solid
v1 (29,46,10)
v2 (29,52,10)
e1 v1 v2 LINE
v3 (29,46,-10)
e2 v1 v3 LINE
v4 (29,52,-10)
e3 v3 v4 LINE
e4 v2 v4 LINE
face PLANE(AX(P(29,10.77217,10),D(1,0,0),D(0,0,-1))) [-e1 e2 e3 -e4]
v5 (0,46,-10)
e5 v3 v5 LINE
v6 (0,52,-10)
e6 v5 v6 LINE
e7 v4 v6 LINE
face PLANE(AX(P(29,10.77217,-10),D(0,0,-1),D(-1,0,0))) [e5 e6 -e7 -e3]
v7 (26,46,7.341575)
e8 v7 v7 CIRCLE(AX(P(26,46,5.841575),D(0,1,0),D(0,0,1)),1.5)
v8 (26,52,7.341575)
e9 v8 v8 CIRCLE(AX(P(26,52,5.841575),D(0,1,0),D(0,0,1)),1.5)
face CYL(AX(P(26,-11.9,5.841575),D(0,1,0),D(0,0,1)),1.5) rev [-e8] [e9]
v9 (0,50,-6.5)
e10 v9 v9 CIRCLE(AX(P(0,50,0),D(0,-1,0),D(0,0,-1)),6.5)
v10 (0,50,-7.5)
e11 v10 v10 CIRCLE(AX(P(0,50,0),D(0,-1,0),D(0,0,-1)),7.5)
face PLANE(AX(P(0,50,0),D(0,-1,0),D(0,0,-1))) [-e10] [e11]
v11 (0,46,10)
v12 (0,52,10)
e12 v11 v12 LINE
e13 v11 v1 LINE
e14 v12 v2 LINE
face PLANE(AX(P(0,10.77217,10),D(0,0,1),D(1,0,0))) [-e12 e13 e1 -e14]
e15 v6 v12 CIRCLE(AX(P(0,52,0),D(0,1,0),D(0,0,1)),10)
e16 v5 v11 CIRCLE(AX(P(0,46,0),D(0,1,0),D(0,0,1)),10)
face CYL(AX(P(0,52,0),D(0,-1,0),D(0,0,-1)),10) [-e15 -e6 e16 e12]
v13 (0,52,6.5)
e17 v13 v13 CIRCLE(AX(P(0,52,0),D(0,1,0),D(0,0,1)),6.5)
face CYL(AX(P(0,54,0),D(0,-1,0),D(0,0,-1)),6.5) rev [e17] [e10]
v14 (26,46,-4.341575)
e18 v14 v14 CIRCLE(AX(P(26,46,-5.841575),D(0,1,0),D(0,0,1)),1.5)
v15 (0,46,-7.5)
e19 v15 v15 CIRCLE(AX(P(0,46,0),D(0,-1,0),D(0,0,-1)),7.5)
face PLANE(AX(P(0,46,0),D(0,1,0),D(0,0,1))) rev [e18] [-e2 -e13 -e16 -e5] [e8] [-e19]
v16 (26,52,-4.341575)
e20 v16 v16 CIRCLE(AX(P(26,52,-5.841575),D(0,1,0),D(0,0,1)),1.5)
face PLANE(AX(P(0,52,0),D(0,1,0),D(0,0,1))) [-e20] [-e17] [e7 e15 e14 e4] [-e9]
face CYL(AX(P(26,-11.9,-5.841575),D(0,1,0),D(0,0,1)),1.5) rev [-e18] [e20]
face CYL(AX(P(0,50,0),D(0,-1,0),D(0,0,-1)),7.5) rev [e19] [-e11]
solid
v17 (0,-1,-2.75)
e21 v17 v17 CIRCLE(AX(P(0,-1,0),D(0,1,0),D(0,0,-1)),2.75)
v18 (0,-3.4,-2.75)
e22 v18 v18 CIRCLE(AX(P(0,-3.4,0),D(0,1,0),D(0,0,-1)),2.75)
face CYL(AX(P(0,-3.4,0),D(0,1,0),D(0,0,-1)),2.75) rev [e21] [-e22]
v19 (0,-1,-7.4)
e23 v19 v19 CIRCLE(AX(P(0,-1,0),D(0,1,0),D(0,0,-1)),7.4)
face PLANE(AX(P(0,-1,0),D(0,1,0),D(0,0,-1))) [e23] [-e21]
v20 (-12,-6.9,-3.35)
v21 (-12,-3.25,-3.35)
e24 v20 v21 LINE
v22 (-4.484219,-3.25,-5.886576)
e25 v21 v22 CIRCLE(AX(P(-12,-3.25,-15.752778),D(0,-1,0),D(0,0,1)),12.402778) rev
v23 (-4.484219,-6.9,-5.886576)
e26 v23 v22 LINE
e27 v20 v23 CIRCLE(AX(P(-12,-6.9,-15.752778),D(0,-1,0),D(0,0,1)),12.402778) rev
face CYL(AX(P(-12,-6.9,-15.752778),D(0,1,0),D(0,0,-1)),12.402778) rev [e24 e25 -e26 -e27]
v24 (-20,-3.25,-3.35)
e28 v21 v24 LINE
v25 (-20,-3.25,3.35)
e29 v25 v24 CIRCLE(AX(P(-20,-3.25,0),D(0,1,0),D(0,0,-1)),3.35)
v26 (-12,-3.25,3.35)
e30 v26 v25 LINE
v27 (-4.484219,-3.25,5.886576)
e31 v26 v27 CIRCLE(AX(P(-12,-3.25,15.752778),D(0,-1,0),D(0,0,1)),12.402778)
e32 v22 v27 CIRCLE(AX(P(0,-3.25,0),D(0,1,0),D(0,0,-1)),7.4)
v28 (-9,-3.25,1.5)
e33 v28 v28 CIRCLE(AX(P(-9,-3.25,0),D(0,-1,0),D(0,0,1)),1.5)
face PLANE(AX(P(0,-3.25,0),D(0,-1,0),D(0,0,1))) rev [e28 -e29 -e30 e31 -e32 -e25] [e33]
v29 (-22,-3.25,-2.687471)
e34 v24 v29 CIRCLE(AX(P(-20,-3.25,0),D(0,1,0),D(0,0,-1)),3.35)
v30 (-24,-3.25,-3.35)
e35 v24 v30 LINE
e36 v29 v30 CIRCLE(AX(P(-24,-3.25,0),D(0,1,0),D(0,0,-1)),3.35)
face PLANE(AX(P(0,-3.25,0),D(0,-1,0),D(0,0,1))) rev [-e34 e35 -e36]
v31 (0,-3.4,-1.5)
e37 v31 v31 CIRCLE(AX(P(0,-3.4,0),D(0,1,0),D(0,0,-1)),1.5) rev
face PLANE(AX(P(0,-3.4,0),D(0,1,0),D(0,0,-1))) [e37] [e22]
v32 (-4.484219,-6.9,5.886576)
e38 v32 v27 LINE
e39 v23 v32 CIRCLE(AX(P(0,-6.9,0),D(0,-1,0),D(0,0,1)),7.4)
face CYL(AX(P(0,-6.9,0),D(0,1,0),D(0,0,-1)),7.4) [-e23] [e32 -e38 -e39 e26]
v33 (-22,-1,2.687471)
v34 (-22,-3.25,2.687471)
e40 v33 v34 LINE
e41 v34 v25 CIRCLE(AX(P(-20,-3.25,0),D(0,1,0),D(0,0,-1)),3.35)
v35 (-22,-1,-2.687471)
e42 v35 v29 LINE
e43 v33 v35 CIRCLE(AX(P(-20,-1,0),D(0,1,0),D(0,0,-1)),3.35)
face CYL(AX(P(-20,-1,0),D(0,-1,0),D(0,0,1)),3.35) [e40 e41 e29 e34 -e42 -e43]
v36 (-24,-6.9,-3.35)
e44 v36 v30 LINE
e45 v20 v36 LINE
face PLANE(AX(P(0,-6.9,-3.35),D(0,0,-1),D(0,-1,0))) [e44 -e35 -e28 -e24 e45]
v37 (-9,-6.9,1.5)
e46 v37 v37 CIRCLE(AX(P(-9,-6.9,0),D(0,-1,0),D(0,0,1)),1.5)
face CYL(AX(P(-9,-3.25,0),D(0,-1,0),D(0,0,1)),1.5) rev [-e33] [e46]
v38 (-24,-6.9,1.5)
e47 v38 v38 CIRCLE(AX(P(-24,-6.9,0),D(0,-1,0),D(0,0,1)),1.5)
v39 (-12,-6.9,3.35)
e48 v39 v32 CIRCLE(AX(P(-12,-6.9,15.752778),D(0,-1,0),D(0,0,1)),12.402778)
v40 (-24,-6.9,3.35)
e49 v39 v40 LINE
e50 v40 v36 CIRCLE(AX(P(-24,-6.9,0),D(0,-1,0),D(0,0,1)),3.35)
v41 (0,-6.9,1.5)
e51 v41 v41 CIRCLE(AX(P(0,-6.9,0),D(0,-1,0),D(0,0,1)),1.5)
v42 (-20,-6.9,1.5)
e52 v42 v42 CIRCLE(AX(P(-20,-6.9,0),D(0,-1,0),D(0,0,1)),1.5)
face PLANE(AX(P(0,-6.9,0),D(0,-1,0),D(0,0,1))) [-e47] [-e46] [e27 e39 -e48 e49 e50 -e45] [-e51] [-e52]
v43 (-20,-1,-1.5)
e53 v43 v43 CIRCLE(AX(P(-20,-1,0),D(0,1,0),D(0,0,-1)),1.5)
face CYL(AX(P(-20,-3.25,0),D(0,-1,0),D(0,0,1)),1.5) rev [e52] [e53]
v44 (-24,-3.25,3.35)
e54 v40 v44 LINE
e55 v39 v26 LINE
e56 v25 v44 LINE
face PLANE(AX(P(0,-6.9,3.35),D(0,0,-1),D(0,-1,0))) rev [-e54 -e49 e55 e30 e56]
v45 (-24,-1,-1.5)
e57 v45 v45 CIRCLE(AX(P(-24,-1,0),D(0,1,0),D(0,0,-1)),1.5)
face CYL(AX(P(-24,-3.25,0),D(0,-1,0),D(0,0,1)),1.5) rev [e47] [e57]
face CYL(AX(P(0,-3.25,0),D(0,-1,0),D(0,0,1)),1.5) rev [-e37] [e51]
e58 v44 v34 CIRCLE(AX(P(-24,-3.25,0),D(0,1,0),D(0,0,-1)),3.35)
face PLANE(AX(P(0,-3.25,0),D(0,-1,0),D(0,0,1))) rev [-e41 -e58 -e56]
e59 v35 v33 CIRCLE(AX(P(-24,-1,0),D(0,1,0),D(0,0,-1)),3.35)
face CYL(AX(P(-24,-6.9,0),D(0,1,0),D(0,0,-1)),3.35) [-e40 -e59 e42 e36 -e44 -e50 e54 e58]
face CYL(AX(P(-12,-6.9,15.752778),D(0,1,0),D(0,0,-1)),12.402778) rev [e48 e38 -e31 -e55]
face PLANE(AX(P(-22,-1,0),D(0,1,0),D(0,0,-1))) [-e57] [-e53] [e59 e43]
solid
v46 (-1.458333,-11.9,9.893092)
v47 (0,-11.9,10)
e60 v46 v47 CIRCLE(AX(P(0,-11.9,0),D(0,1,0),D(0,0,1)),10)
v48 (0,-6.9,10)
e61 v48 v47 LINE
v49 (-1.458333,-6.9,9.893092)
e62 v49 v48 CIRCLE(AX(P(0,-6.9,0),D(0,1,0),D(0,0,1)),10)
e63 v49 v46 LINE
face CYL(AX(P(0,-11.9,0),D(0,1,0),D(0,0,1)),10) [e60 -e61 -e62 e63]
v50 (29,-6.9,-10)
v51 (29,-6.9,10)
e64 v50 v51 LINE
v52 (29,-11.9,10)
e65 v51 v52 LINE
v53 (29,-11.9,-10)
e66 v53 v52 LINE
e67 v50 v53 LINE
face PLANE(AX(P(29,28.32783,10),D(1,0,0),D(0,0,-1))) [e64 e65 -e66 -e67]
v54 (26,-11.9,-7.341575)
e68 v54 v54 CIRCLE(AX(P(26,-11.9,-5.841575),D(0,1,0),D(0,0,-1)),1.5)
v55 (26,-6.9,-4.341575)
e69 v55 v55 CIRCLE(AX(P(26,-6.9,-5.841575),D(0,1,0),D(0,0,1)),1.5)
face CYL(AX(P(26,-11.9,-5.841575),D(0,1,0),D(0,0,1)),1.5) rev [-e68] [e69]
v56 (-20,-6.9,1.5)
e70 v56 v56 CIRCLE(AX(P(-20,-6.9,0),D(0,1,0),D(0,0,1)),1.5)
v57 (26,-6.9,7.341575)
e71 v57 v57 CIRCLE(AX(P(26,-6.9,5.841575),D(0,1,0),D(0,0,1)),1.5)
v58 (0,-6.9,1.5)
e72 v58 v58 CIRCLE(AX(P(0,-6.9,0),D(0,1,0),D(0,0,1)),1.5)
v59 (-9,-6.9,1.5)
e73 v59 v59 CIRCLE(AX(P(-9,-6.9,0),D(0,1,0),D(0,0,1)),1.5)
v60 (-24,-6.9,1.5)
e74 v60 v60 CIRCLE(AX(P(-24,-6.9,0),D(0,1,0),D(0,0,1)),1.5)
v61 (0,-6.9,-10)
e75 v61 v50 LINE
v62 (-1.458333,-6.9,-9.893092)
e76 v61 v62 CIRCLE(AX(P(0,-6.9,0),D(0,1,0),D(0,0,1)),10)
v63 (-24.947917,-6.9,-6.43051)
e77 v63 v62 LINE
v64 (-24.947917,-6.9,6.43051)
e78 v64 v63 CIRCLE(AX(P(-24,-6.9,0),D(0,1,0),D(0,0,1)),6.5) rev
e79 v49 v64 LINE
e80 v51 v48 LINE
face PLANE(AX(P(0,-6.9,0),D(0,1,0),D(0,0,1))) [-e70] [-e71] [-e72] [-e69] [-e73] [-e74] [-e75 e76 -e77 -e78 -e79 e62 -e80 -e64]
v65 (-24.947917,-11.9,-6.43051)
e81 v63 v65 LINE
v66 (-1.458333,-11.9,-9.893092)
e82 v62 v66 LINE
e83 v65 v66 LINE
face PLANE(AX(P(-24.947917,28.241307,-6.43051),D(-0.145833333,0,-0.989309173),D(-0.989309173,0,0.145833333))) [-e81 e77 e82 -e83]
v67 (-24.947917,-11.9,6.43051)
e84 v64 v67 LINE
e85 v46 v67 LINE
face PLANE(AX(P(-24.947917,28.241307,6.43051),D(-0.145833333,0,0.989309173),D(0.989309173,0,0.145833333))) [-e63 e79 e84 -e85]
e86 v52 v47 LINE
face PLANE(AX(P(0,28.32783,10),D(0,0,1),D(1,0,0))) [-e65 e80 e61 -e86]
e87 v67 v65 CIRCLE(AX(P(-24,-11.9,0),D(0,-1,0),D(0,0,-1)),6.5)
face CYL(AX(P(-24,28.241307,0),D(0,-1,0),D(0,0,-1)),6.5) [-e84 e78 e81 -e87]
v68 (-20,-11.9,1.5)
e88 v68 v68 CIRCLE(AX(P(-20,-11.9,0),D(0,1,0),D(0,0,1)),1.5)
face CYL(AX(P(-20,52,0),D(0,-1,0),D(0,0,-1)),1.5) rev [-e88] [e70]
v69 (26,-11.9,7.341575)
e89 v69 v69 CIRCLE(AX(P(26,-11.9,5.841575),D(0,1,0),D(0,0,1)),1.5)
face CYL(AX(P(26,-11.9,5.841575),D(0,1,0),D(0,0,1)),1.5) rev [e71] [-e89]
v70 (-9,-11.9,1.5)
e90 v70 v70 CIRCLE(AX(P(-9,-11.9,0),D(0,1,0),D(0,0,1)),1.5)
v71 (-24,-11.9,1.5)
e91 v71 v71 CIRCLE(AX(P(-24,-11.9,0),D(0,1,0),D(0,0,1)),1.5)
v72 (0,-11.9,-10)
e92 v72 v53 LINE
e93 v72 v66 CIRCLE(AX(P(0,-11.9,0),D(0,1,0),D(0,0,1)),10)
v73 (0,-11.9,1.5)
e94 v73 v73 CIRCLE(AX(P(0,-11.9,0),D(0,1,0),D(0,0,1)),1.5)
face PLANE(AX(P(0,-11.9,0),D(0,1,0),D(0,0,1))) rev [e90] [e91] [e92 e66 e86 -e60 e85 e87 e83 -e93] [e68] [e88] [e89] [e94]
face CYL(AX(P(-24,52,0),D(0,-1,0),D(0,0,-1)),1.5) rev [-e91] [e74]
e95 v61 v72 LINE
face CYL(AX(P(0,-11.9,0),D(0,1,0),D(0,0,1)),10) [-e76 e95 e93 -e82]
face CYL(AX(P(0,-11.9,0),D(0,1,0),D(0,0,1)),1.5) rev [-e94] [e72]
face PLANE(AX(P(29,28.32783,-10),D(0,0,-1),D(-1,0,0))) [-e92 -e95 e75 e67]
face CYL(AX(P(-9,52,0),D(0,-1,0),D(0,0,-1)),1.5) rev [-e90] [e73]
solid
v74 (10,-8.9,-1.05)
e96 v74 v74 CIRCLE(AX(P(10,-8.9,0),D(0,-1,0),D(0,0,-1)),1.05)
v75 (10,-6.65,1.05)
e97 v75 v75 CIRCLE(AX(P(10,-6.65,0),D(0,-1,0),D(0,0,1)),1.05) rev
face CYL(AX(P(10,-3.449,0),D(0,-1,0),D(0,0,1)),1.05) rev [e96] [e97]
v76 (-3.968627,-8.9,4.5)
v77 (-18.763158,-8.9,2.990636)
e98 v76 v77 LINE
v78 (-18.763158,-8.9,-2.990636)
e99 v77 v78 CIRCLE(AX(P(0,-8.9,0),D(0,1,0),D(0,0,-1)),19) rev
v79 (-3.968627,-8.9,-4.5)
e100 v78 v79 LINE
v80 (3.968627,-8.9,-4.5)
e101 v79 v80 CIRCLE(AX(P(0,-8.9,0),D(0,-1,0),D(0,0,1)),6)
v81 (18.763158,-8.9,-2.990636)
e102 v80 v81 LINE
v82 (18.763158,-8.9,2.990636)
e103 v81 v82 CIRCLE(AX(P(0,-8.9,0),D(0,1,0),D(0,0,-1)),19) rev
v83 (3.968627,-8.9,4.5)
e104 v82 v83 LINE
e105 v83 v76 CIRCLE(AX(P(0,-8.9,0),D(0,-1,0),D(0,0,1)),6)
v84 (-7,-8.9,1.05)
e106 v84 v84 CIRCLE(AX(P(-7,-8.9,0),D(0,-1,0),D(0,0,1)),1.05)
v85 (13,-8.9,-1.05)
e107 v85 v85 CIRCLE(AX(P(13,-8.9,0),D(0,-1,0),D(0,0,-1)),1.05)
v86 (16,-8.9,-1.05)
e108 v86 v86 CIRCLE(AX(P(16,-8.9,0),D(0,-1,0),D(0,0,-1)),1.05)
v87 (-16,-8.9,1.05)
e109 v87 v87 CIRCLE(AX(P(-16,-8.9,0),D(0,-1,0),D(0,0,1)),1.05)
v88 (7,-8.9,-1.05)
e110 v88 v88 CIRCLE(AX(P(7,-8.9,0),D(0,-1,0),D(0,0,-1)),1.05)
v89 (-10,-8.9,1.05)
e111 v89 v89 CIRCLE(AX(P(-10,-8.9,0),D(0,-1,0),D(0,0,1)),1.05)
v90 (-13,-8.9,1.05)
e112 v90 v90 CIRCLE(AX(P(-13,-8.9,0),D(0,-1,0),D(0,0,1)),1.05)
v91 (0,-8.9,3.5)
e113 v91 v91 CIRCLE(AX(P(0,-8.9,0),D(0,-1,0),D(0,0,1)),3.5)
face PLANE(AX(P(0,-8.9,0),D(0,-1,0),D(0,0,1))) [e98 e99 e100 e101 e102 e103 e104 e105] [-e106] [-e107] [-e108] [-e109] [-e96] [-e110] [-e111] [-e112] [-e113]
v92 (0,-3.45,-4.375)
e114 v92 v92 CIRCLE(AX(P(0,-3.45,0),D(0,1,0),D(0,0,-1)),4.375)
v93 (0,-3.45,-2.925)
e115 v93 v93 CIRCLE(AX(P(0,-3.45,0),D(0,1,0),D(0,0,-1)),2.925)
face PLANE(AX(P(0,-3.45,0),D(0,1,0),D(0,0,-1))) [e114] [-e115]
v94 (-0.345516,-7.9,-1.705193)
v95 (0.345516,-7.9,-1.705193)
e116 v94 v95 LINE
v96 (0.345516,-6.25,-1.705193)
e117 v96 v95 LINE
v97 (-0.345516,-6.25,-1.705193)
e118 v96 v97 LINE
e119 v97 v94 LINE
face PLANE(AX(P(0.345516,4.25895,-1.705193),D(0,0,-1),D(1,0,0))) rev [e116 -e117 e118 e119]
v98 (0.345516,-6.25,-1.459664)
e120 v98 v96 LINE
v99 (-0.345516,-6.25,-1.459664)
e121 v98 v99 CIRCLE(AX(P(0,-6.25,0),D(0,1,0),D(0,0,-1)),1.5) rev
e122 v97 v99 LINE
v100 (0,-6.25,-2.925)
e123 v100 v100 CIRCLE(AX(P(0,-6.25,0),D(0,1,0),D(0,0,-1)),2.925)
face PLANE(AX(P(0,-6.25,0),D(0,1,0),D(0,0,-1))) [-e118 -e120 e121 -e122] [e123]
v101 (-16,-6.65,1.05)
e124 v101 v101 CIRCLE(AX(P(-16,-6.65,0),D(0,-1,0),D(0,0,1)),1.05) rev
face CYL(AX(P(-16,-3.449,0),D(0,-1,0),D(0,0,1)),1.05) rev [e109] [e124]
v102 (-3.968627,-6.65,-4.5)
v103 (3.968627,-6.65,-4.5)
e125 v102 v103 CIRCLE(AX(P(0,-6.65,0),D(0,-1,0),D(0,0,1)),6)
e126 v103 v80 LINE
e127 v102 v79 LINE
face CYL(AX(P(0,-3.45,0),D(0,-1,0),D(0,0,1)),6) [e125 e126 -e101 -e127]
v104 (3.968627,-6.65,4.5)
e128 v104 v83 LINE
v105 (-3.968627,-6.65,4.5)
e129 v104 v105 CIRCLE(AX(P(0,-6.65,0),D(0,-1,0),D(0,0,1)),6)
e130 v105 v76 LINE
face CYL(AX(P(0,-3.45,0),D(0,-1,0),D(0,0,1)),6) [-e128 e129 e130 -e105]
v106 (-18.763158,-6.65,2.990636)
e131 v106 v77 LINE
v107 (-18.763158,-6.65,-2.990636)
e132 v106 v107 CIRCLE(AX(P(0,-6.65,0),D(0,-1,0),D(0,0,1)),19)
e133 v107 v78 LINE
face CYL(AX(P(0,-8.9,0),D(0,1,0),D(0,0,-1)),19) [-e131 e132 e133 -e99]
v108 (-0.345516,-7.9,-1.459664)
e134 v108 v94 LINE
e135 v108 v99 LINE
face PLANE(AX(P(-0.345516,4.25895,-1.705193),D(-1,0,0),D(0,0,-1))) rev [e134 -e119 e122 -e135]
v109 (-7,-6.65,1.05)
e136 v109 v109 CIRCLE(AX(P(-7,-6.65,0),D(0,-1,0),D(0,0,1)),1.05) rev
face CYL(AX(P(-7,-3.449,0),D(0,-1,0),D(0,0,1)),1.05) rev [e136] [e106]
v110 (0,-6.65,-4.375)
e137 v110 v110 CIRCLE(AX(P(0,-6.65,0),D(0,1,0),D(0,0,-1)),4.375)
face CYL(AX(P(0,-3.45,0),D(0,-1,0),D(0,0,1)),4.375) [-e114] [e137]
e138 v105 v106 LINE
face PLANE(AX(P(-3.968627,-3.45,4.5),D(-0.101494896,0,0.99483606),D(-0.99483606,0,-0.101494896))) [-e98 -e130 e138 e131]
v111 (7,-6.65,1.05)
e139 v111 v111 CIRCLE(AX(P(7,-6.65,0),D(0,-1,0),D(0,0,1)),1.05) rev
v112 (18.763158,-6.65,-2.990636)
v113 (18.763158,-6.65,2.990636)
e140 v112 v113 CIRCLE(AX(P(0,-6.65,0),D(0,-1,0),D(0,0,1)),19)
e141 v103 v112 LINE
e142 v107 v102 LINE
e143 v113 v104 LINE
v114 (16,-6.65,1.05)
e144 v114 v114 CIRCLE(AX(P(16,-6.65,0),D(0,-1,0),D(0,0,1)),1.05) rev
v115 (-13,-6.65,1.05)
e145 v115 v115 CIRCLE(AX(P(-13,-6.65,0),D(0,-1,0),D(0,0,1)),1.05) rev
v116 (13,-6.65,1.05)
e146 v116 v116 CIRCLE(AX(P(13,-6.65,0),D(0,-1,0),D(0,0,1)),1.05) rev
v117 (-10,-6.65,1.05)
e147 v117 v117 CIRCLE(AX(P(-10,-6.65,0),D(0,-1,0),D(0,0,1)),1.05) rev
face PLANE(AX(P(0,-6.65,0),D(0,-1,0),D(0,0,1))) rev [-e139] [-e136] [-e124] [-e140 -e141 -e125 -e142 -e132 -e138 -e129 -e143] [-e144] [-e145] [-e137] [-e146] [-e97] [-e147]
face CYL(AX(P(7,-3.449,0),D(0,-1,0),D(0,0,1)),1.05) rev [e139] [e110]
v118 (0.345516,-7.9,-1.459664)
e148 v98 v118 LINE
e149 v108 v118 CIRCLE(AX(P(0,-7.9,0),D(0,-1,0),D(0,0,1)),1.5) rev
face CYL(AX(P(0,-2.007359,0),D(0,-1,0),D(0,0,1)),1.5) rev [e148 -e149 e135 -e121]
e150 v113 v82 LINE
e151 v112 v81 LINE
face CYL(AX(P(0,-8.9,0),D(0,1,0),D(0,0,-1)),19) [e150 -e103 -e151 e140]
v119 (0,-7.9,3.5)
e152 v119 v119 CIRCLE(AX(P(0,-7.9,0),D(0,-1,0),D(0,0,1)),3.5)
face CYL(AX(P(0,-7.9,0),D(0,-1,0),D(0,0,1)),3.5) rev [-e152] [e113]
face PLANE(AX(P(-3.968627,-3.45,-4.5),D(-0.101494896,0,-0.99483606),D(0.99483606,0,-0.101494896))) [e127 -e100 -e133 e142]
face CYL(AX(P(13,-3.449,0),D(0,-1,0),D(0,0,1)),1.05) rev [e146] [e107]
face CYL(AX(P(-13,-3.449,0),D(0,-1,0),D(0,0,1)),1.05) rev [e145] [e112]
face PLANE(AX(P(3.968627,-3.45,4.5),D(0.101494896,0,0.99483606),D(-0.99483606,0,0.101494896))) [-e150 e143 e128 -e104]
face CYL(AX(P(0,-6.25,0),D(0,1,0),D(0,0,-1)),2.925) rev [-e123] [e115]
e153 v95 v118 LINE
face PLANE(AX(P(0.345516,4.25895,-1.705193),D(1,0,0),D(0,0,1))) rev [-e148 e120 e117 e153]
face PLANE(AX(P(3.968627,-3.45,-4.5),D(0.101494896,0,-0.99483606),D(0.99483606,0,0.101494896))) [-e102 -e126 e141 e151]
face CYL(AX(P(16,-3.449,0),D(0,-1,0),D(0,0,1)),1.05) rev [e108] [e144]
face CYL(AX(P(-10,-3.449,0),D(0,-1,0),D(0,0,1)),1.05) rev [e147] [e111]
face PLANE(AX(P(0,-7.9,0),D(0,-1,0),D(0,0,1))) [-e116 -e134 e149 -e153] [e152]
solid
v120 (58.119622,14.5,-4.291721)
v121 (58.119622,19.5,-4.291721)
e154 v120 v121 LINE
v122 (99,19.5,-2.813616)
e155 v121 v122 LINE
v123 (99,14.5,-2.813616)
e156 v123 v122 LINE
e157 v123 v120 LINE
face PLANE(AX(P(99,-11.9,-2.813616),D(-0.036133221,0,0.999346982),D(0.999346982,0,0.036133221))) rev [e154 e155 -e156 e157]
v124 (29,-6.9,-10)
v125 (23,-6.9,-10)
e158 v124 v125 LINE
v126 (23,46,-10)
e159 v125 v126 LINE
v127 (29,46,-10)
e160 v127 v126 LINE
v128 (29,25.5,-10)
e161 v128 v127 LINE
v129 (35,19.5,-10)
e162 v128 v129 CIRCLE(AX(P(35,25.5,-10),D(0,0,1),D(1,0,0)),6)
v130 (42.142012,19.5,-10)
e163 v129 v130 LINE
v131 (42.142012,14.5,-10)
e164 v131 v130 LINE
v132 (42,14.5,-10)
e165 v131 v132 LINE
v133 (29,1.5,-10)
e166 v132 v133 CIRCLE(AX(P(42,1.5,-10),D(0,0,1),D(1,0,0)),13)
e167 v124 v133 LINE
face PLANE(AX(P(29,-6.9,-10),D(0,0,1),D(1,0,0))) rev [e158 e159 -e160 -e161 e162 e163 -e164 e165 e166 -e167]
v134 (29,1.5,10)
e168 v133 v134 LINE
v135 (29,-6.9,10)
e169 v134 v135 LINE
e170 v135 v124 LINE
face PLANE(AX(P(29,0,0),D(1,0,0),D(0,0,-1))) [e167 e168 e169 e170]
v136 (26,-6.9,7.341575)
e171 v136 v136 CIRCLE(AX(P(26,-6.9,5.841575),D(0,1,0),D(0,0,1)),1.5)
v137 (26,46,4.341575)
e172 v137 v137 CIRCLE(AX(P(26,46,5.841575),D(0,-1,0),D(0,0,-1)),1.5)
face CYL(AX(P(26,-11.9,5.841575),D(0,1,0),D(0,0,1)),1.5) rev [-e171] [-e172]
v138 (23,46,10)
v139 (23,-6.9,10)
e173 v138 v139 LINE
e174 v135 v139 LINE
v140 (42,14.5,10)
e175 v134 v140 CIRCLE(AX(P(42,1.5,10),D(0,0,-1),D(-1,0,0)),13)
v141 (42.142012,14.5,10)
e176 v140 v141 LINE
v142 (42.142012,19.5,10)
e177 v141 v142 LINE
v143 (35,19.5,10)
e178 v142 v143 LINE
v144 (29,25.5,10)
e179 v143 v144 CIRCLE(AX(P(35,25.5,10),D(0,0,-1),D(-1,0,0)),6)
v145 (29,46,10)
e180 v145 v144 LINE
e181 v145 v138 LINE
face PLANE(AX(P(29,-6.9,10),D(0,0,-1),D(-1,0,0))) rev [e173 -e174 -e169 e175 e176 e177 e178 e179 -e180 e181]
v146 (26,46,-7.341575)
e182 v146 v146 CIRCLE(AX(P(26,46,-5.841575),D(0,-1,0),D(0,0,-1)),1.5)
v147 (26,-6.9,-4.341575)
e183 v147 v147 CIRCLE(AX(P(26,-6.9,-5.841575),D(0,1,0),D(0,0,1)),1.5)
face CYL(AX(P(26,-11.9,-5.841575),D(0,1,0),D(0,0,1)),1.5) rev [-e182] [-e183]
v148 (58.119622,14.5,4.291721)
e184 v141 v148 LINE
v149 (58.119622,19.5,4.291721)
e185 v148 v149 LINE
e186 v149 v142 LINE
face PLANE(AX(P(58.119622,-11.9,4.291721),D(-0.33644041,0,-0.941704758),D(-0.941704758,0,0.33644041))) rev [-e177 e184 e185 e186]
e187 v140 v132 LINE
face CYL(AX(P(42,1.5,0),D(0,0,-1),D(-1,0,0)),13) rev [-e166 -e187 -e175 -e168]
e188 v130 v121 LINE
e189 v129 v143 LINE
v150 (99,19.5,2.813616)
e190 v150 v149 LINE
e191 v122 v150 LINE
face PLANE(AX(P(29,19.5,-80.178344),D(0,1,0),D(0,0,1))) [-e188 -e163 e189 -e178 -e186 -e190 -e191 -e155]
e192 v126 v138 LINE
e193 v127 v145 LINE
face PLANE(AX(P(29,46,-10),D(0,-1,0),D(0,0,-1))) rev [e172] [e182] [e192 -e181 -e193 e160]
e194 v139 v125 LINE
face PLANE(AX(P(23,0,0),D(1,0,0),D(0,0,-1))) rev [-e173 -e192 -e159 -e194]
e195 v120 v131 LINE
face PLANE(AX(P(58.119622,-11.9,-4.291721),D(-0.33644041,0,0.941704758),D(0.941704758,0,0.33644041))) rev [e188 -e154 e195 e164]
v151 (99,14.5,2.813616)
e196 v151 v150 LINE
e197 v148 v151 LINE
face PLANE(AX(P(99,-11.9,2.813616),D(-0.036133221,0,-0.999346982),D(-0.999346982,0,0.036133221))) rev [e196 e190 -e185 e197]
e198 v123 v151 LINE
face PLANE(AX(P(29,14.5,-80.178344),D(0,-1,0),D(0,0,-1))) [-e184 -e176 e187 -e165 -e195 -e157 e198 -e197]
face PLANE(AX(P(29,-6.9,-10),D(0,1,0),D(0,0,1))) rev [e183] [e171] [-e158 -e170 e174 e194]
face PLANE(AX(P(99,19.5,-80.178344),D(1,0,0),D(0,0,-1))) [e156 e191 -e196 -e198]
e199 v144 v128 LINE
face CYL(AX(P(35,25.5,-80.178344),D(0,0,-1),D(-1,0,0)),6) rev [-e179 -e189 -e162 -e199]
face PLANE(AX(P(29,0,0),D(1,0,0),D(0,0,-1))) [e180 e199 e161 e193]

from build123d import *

# Parameters (mm, degrees)
SKETCH2_R                                = 10
BOSS_EXTRUDE1_DEPTH                      = 5
SKETCH3_R                                = 10
BOSS_EXTRUDE2_DEPTH                      = 6
SKETCH4_R                                = 7.5
CUT_EXTRUDE1_DEPTH                       = 4
SKETCH5_R                                = 6.5
CUT_EXTRUDE2_DEPTH                       = 4
MG995_START                              = -0.991050259
MG995_SERVO_HORN_TWO_PRONG_OUTLINE_R     = 1.05
MG995_SERVO_HORN_TWO_PRONG_OUTLINE_R_2   = 3.5
MG995_SERVO_HORN_TWO_PRONG_DEPTH         = 2.25
MG995_START_2                            = -4.191050259
MG995_SERVO_HORN_TWO_PRONG_2_OUTLINE_R   = 4.375
MG995_SERVO_HORN_TWO_PRONG_2_OUTLINE_R_2 = 2.925
MG995_SERVO_HORN_TWO_PRONG_2_DEPTH       = 4.45
MG995_START_3                            = -1.391050259
MG995_SERVO_HORN_TWO_PRONG_3_OUTLINE_R   = 2.925
MG995_SERVO_HORN_TWO_PRONG_3_OUTLINE_R_2 = 1.5
MG995_SERVO_HORN_TWO_PRONG_3_DEPTH       = 1.65
CUT_EXTRUDE3_DEPTH                       = 66.200930898
CUT_EXTRUDE3_DEPTH_BACK                  = 66.200930898
SKETCH6_W                                = 0.691032415
SKETCH6_H                                = 0.410386563
BODY_MOVE_COPY1_ANGLE                    = 180
SKETCH43_W                               = 20
SKETCH43_H                               = 52.9
BOSS_EXTRUDE19_DEPTH                     = 6
BOSS_EXTRUDE20_DEPTH                     = 6
BOSS_EXTRUDE21_START                     = -5
BOSS_EXTRUDE21_DEPTH                     = 5
CUT_EXTRUDE23_DEPTH                      = 71.881661944
CUT_EXTRUDE23_DEPTH_BACK                 = 71.881661944
SKETCH47_R                               = 1.5
SKETCH49_W                               = 70
SKETCH49_H                               = 5
BOSS_EXTRUDE22_DEPTH                     = 20
CUT_EXTRUDE24_DEPTH                      = 105.67688379
CUT_EXTRUDE24_DEPTH_BACK                 = 105.67688379
FILLET1_R                                = 6
FILLET2_R                                = 13
CUT_EXTRUDE28_DEPTH                      = 113.271991164
CUT_EXTRUDE28_DEPTH_BACK                 = 113.271991164
SKETCH54_R                               = 1.5
HORN_START                               = 37.033233578
HORN_25T_METAL_OUTLINE_R                 = 7.4
HORN_25T_METAL_OUTLINE_R_2               = 2.75
HORN_25T_METAL_OUTLINE_R_3               = 1.5
HORN_25T_METAL_DEPTH                     = 5.9
HORN_START_2                             = 39.433233578
HORN_25T_METAL_2_OUTLINE_R               = 1.5
HORN_25T_METAL_2_OUTLINE_R_2             = 2.75
HORN_25T_METAL_2_DEPTH                   = 3.5
HORN_START_3                             = 39.283233578
HORN_25T_METAL_3_OUTLINE_R               = 1.5
HORN_25T_METAL_3_DEPTH                   = 0.15
BODY_MOVE_COPY2_ANGLE                    = 120
BOSS_EXTRUDE23_START                     = -5
BOSS_EXTRUDE23_DEPTH                     = 5
CUT_EXTRUDE29_DEPTH                      = 119.254851909
CUT_EXTRUDE29_DEPTH_BACK                 = 119.254851909
SKETCH57_R                               = 1.5


with BuildPart() as part:
    # Sketch2 → Boss-Extrude1 (new body)
    with BuildSketch(Plane(origin=(0, -6.9, 0), x_dir=(1, 0, 0), z_dir=(0, 1, 0))):
        with Locations(Location((0, 0, 0), (0, 0, 270))):
            Circle(SKETCH2_R)
    extrude(amount=-BOSS_EXTRUDE1_DEPTH)

    # Sketch45 → Boss-Extrude21 (add)
    with BuildSketch(Plane.XZ.offset(11.9).offset(BOSS_EXTRUDE21_START)):
        with BuildLine():
            Line((0, 10), (29, 10))
            Line((29, 10), (29, -10))
            Line((29, -10), (0, -10))
            ThreePointArc((0, -10), (10, 0), (0, 10))
        make_face()
    extrude(amount=BOSS_EXTRUDE21_DEPTH)


with BuildPart() as body_2:
    # Sketch3 → Boss-Extrude2 (new body)
    with BuildSketch(Plane(origin=(0, 46, 0), x_dir=(1, 0, 0), z_dir=(0, 1, 0))):
        with Locations(Location((0, 0, 0), (0, 0, 270))):
            Circle(SKETCH3_R)
    extrude(amount=BOSS_EXTRUDE2_DEPTH)

    # Sketch4 → Cut-Extrude1 (cut)
    with BuildSketch(Plane.XZ.offset(-46)):
        with Locations(Location((0, 0, 0), (0, 0, 270))):
            Circle(SKETCH4_R)
    extrude(amount=-CUT_EXTRUDE1_DEPTH, mode=Mode.SUBTRACT)

    # Sketch5 → Cut-Extrude2 (cut)
    with BuildSketch(Plane.XZ.offset(-50)):
        with Locations(Location((0, 0, 0), (0, 0, 270))):
            Circle(SKETCH5_R)
    extrude(amount=-CUT_EXTRUDE2_DEPTH, mode=Mode.SUBTRACT)

    # Sketch44 → Boss-Extrude20 (add)
    with BuildSketch(Plane(origin=(0, 52, 0), x_dir=(1, 0, 0), z_dir=(0, 1, 0))):
        with BuildLine():
            Line((29, 10), (0, 10))
            ThreePointArc((0, 10), (10, 0), (0, -10))
            Line((0, -10), (29, -10))
            Line((29, -10), (29, 10))
        make_face()
    extrude(amount=-BOSS_EXTRUDE20_DEPTH)


with BuildPart() as body_3:
    # MG995- SERVO HORN TWO PRONG: read off the stored shape, not the designer's step
    # MG995- SERVO HORN TWO PRONG outline → MG995- SERVO HORN TWO PRONG (new body)
    with BuildSketch(Plane(origin=(0, 0, 0), x_dir=(1, 0, 0), z_dir=(0, 1, 0)).offset(MG995_START)):
        with BuildLine():
            ThreePointArc((-5.001086692, 19.366332961), (-5.237928798, 16.375696604), (-5.001086692, 13.385060248))
            Line((-5.001086692, 13.385060248), (9.793444236, 11.875696605))
            ThreePointArc((9.793444236, 11.875696605), (13.762071202, 10.375696605), (17.730698169, 11.875696605))
            Line((17.730698169, 11.875696605), (32.525229097, 13.385060248))
            ThreePointArc((32.525229097, 13.385060248), (32.762071202, 16.375696604), (32.525229097, 19.366332961))
            Line((32.525229097, 19.366332961), (17.730698169, 20.875696605))
            ThreePointArc((17.730698169, 20.875696605), (13.762071202, 22.375696605), (9.793444236, 20.875696605))
            Line((9.793444236, 20.875696605), (-5.001086692, 19.366332961))
        make_face()
        with Locations((-2.237928798, 16.375696605)):
            Circle(MG995_SERVO_HORN_TWO_PRONG_OUTLINE_R, mode=Mode.SUBTRACT)
        with Locations((0.762071202, 16.375696605)):
            Circle(MG995_SERVO_HORN_TWO_PRONG_OUTLINE_R, mode=Mode.SUBTRACT)
        with Locations((3.762071202, 16.375696605)):
            Circle(MG995_SERVO_HORN_TWO_PRONG_OUTLINE_R, mode=Mode.SUBTRACT)
        with Locations((6.762071202, 16.375696605)):
            Circle(MG995_SERVO_HORN_TWO_PRONG_OUTLINE_R, mode=Mode.SUBTRACT)
        with Locations((20.762071202, 16.375696605)):
            Circle(MG995_SERVO_HORN_TWO_PRONG_OUTLINE_R, mode=Mode.SUBTRACT)
        with Locations((23.762071202, 16.375696605)):
            Circle(MG995_SERVO_HORN_TWO_PRONG_OUTLINE_R, mode=Mode.SUBTRACT)
        with Locations((26.762071202, 16.375696605)):
            Circle(MG995_SERVO_HORN_TWO_PRONG_OUTLINE_R, mode=Mode.SUBTRACT)
        with Locations((29.762071202, 16.375696605)):
            Circle(MG995_SERVO_HORN_TWO_PRONG_OUTLINE_R, mode=Mode.SUBTRACT)
        with Locations((13.762071202, 16.375696605)):
            Circle(MG995_SERVO_HORN_TWO_PRONG_OUTLINE_R_2, mode=Mode.SUBTRACT)
    extrude(amount=MG995_SERVO_HORN_TWO_PRONG_DEPTH)

    # MG995- SERVO HORN TWO PRONG 2 outline → MG995- SERVO HORN TWO PRONG 2 (add)
    with BuildSketch(Plane(origin=(0, 0, 0), x_dir=(1, 0, 0), z_dir=(0, 1, 0)).offset(MG995_START_2)):
        with Locations((13.762071202, 16.375696605)):
            Circle(MG995_SERVO_HORN_TWO_PRONG_2_OUTLINE_R)
        with Locations((13.762071202, 16.375696605)):
            Circle(MG995_SERVO_HORN_TWO_PRONG_2_OUTLINE_R_2, mode=Mode.SUBTRACT)
    extrude(amount=MG995_SERVO_HORN_TWO_PRONG_2_DEPTH)

    # MG995- SERVO HORN TWO PRONG 3 outline → MG995- SERVO HORN TWO PRONG 3 (add)
    with BuildSketch(Plane(origin=(0, 0, 0), x_dir=(1, 0, 0), z_dir=(0, 1, 0)).offset(MG995_START_3)):
        with Locations((13.762071202, 16.375696605)):
            Circle(MG995_SERVO_HORN_TWO_PRONG_3_OUTLINE_R)
        with Locations((13.762071202, 16.375696605)):
            Circle(MG995_SERVO_HORN_TWO_PRONG_3_OUTLINE_R_2, mode=Mode.SUBTRACT)
    extrude(amount=MG995_SERVO_HORN_TWO_PRONG_3_DEPTH)

    # Sketch6 → Cut-Extrude3 (cut, two sides: drawn at the far end of the back side and taken through both)
    with BuildSketch(Plane(origin=(0, 0.258949741, 0), x_dir=(1, 0, 0), z_dir=(0, 1, 0)).offset(-CUT_EXTRUDE3_DEPTH_BACK)):
        with Locations((13.762071202, 17.875696604)):
            Rectangle(SKETCH6_W, SKETCH6_H)
    extrude(amount=CUT_EXTRUDE3_DEPTH + CUT_EXTRUDE3_DEPTH_BACK, mode=Mode.SUBTRACT)


with BuildPart() as body_3_1:
    # Body-Move/Copy1: read off the stored shape, not the designer's step
    # Body-Move/Copy1: moved
    add(body_3.part.moved(Location((-13.7620712, 7.6410503, 16.3756966))).rotate(Axis((0, 0, 0), (0, 0, 1)), BODY_MOVE_COPY1_ANGLE))


with BuildPart() as body_4:
    # Sketch43 → Boss-Extrude19 (new body)
    with BuildSketch(Plane(origin=(23, 0, 0), x_dir=(0, 0, -1), z_dir=(1, 0, 0))):
        with Locations((0, 19.55)):
            Rectangle(SKETCH43_W, SKETCH43_H)
    extrude(amount=BOSS_EXTRUDE19_DEPTH)


with BuildPart() as cut_extrude23_tool:
    # Sketch47 → Cut-Extrude23 (new, two sides: drawn at the far end of the back side and taken through both)
    with BuildSketch(Plane(origin=(0, 52, 0), x_dir=(1, 0, 0), z_dir=(0, 1, 0)).offset(-CUT_EXTRUDE23_DEPTH_BACK)):
        with Locations(Location((26, -5.841574982, 0), (0, 0, 270))):
            Circle(SKETCH47_R)
        with Locations(Location((26, 5.841574982, 0), (0, 0, 270))):
            Circle(SKETCH47_R)
    extrude(amount=CUT_EXTRUDE23_DEPTH + CUT_EXTRUDE23_DEPTH_BACK)


with BuildPart() as part_1:
    add(part.part)

    # Cut-Extrude23: cut by cut_extrude23_tool
    add(cut_extrude23_tool.part, mode=Mode.SUBTRACT)

    # Sketch54 → Cut-Extrude28 (cut, two sides: drawn at the far end of the back side and taken through both)
    with BuildSketch(Plane(origin=(0, 0, 0), x_dir=(1, 0, 0), z_dir=(0, 1, 0)).offset(-CUT_EXTRUDE28_DEPTH_BACK)):
        with Locations(Location((0, 0, 0), (0, 0, 270))):
            Circle(SKETCH54_R)
    extrude(amount=CUT_EXTRUDE28_DEPTH + CUT_EXTRUDE28_DEPTH_BACK, mode=Mode.SUBTRACT)

    # Sketch55 → Boss-Extrude23 (add)
    with BuildSketch(Plane.XZ.offset(11.9).offset(BOSS_EXTRUDE23_START)):
        with BuildLine():
            Line((-24.947916667, 6.430509622), (-1.458333333, 9.893091725))
            ThreePointArc((-1.458333333, 9.893091725), (-10, 0), (-1.458333333, -9.893091725))
            Line((-1.458333333, -9.893091725), (-24.947916667, -6.430509622))
            ThreePointArc((-24.947916667, -6.430509622), (-30.5, 0), (-24.947916667, 6.430509622))
        make_face()
    extrude(amount=BOSS_EXTRUDE23_DEPTH)

    # Sketch57 → Cut-Extrude29 (cut, two sides: drawn at the far end of the back side and taken through both)
    with BuildSketch(Plane.XZ.offset(11.9).offset(-CUT_EXTRUDE29_DEPTH_BACK)):
        with Locations(Location((-9, 0, 0), (0, 0, 90))):
            Circle(SKETCH57_R)
        with Locations(Location((-20, 0, 0), (0, 0, 90))):
            Circle(SKETCH57_R)
        with Locations(Location((-24, 0, 0), (0, 0, 90))):
            Circle(SKETCH57_R)
    extrude(amount=CUT_EXTRUDE29_DEPTH + CUT_EXTRUDE29_DEPTH_BACK, mode=Mode.SUBTRACT)


with BuildPart() as body_2_1:
    add(body_2.part)

    # Cut-Extrude23: cut by cut_extrude23_tool
    add(cut_extrude23_tool.part, mode=Mode.SUBTRACT)


with BuildPart() as body_4_1:
    add(body_4.part)

    # Cut-Extrude23: cut by cut_extrude23_tool
    add(cut_extrude23_tool.part, mode=Mode.SUBTRACT)

    # Sketch49 → Boss-Extrude22 (add)
    with BuildSketch(Plane.XY.offset(10)):
        with Locations((64, 17)):
            Rectangle(SKETCH49_W, SKETCH49_H)
    extrude(amount=-BOSS_EXTRUDE22_DEPTH)

    # Sketch50 → Cut-Extrude24 (cut, two sides: drawn at the far end of the back side and taken through both)
    with BuildSketch(Plane(origin=(0, 19.5, 0), x_dir=(1, 0, 0), z_dir=(0, 1, 0)).offset(-CUT_EXTRUDE24_DEPTH_BACK)):
        Polygon((99, 2.813615729), (58.119622414, 4.29172066), (42.142011972, 10), (99, 10), align=None)
        Polygon((99, -10), (99, -2.813615729), (58.119622414, -4.29172066), (42.142011972, -10), align=None)
    extrude(amount=CUT_EXTRUDE24_DEPTH + CUT_EXTRUDE24_DEPTH_BACK, mode=Mode.SUBTRACT)

    # Fillet1
    fillet1_edges = [body_4_1.edges().sort_by_distance(p)[0] for p in [
        (29, 19.5, 0),
    ]]
    fillet(fillet1_edges, radius=FILLET1_R)

    # Fillet2
    fillet2_edges = [body_4_1.edges().sort_by_distance(p)[0] for p in [
        (29, 14.5, 0),
    ]]
    fillet(fillet2_edges, radius=FILLET2_R)


with BuildPart() as body_5:
    # HORN 25T METAL: read off the stored shape, not the designer's step
    # HORN 25T METAL outline → HORN 25T METAL (new body)
    # profile 1 of 2: a face of its own
    with BuildSketch(Plane.XY.offset(HORN_START)):
        with Locations((77.940039679, 42.639661246)):
            Circle(HORN_25T_METAL_OUTLINE_R)
        with Locations((77.940039679, 42.639661246)):
            Circle(HORN_25T_METAL_OUTLINE_R_2, mode=Mode.SUBTRACT)
    # profile 2 of 2: a face of its own
    with BuildSketch(Plane.XY.offset(HORN_START)):
        with BuildLine():
            ThreePointArc((75.252568749, 64.639661246), (77.940039679, 59.289661246), (80.627510609, 64.639661246))
            ThreePointArc((80.627510609, 64.639661246), (77.940039679, 69.989661246), (75.252568749, 64.639661246))
        make_face()
        with Locations((77.940039679, 62.639661246)):
            Circle(HORN_25T_METAL_OUTLINE_R_3, mode=Mode.SUBTRACT)
        with Locations((77.940039679, 66.639661246)):
            Circle(HORN_25T_METAL_OUTLINE_R_3, mode=Mode.SUBTRACT)
    extrude(amount=HORN_25T_METAL_DEPTH)

    # HORN 25T METAL 2 outline → HORN 25T METAL 2 (add)
    # profile 1 of 4: a face of its own
    with BuildSketch(Plane.XY.offset(HORN_START_2)):
        with BuildLine():
            Line((74.590039679, 62.639661246), (74.590039679, 54.639661246))
            ThreePointArc((74.590039679, 54.639661246), (73.938798084, 50.673517785), (72.053463722, 47.123880632))
            ThreePointArc((72.053463722, 47.123880632), (77.940039679, 50.039661246), (83.826615636, 47.123880632))
            ThreePointArc((83.826615636, 47.123880632), (81.941281274, 50.673517785), (81.290039679, 54.639661246))
            Line((81.290039679, 54.639661246), (81.290039679, 62.639661246))
            ThreePointArc((81.290039679, 62.639661246), (77.940039679, 59.289661246), (74.590039679, 62.639661246))
        make_face()
        with Locations((77.940039679, 51.639661246)):
            Circle(HORN_25T_METAL_2_OUTLINE_R, mode=Mode.SUBTRACT)
    # profile 2 of 4: a face of its own
    with BuildSketch(Plane.XY.offset(HORN_START_2)):
        with BuildLine():
            Line((74.590039679, 66.639661246), (74.590039679, 62.639661246))
            ThreePointArc((74.590039679, 62.639661246), (74.759982477, 63.693101416), (75.252568749, 64.639661246))
            ThreePointArc((75.252568749, 64.639661246), (74.759982477, 65.586221076), (74.590039679, 66.639661246))
        make_face()
    # profile 3 of 4: a face of its own
    with BuildSketch(Plane.XY.offset(HORN_START_2)):
        with BuildLine():
            ThreePointArc((80.627510609, 64.639661246), (81.120096881, 63.693101416), (81.290039679, 62.639661246))
            Line((81.290039679, 62.639661246), (81.290039679, 66.639661246))
            ThreePointArc((81.290039679, 66.639661246), (81.120096881, 65.586221076), (80.627510609, 64.639661246))
        make_face()
    # profile 4 of 4: a face of its own
    with BuildSketch(Plane.XY.offset(HORN_START_2)):
        with Locations((77.940039679, 42.639661246)):
            Circle(HORN_25T_METAL_2_OUTLINE_R_2)
        with Locations((77.940039679, 42.639661246)):
            Circle(HORN_25T_METAL_2_OUTLINE_R, mode=Mode.SUBTRACT)
    extrude(amount=HORN_25T_METAL_2_DEPTH)

    # HORN 25T METAL 3 outline → HORN 25T METAL 3 (add)
    # profile 1 of 3: a face of its own
    with BuildSketch(Plane.XY.offset(HORN_START_3)):
        with BuildLine():
            Line((74.590039679, 62.639661246), (74.590039679, 54.639661246))
            ThreePointArc((74.590039679, 54.639661246), (73.938798084, 50.673517785), (72.053463722, 47.123880632))
            ThreePointArc((72.053463722, 47.123880632), (77.940039679, 50.039661246), (83.826615636, 47.123880632))
            ThreePointArc((83.826615636, 47.123880632), (81.941281274, 50.673517785), (81.290039679, 54.639661246))
            Line((81.290039679, 54.639661246), (81.290039679, 62.639661246))
            ThreePointArc((81.290039679, 62.639661246), (77.940039679, 59.289661246), (74.590039679, 62.639661246))
        make_face()
        with Locations((77.940039679, 51.639661246)):
            Circle(HORN_25T_METAL_3_OUTLINE_R, mode=Mode.SUBTRACT)
    # profile 2 of 3: a face of its own
    with BuildSketch(Plane.XY.offset(HORN_START_3)):
        with BuildLine():
            Line((74.590039679, 66.639661246), (74.590039679, 62.639661246))
            ThreePointArc((74.590039679, 62.639661246), (74.759982477, 63.693101416), (75.252568749, 64.639661246))
            ThreePointArc((75.252568749, 64.639661246), (74.759982477, 65.586221076), (74.590039679, 66.639661246))
        make_face()
    # profile 3 of 3: a face of its own
    with BuildSketch(Plane.XY.offset(HORN_START_3)):
        with BuildLine():
            ThreePointArc((80.627510609, 64.639661246), (81.120096881, 63.693101416), (81.290039679, 62.639661246))
            Line((81.290039679, 62.639661246), (81.290039679, 66.639661246))
            ThreePointArc((81.290039679, 66.639661246), (81.120096881, 65.586221076), (80.627510609, 64.639661246))
        make_face()
    extrude(amount=HORN_25T_METAL_3_DEPTH)


with BuildPart() as body_5_1:
    # Body-Move/Copy2: read off the stored shape, not the designer's step
    # Body-Move/Copy2: moved
    add(body_5.part.moved(Location((-77.9400397, -42.6396612, -36.0332336))).rotate(Axis((0, 0, 0), (0.5773502692, -0.5773502692, 0.5773502692)), BODY_MOVE_COPY2_ANGLE))


solid = Compound([body_3_1.part, part_1.part, body_2_1.part, body_4_1.part, body_5_1.part])
